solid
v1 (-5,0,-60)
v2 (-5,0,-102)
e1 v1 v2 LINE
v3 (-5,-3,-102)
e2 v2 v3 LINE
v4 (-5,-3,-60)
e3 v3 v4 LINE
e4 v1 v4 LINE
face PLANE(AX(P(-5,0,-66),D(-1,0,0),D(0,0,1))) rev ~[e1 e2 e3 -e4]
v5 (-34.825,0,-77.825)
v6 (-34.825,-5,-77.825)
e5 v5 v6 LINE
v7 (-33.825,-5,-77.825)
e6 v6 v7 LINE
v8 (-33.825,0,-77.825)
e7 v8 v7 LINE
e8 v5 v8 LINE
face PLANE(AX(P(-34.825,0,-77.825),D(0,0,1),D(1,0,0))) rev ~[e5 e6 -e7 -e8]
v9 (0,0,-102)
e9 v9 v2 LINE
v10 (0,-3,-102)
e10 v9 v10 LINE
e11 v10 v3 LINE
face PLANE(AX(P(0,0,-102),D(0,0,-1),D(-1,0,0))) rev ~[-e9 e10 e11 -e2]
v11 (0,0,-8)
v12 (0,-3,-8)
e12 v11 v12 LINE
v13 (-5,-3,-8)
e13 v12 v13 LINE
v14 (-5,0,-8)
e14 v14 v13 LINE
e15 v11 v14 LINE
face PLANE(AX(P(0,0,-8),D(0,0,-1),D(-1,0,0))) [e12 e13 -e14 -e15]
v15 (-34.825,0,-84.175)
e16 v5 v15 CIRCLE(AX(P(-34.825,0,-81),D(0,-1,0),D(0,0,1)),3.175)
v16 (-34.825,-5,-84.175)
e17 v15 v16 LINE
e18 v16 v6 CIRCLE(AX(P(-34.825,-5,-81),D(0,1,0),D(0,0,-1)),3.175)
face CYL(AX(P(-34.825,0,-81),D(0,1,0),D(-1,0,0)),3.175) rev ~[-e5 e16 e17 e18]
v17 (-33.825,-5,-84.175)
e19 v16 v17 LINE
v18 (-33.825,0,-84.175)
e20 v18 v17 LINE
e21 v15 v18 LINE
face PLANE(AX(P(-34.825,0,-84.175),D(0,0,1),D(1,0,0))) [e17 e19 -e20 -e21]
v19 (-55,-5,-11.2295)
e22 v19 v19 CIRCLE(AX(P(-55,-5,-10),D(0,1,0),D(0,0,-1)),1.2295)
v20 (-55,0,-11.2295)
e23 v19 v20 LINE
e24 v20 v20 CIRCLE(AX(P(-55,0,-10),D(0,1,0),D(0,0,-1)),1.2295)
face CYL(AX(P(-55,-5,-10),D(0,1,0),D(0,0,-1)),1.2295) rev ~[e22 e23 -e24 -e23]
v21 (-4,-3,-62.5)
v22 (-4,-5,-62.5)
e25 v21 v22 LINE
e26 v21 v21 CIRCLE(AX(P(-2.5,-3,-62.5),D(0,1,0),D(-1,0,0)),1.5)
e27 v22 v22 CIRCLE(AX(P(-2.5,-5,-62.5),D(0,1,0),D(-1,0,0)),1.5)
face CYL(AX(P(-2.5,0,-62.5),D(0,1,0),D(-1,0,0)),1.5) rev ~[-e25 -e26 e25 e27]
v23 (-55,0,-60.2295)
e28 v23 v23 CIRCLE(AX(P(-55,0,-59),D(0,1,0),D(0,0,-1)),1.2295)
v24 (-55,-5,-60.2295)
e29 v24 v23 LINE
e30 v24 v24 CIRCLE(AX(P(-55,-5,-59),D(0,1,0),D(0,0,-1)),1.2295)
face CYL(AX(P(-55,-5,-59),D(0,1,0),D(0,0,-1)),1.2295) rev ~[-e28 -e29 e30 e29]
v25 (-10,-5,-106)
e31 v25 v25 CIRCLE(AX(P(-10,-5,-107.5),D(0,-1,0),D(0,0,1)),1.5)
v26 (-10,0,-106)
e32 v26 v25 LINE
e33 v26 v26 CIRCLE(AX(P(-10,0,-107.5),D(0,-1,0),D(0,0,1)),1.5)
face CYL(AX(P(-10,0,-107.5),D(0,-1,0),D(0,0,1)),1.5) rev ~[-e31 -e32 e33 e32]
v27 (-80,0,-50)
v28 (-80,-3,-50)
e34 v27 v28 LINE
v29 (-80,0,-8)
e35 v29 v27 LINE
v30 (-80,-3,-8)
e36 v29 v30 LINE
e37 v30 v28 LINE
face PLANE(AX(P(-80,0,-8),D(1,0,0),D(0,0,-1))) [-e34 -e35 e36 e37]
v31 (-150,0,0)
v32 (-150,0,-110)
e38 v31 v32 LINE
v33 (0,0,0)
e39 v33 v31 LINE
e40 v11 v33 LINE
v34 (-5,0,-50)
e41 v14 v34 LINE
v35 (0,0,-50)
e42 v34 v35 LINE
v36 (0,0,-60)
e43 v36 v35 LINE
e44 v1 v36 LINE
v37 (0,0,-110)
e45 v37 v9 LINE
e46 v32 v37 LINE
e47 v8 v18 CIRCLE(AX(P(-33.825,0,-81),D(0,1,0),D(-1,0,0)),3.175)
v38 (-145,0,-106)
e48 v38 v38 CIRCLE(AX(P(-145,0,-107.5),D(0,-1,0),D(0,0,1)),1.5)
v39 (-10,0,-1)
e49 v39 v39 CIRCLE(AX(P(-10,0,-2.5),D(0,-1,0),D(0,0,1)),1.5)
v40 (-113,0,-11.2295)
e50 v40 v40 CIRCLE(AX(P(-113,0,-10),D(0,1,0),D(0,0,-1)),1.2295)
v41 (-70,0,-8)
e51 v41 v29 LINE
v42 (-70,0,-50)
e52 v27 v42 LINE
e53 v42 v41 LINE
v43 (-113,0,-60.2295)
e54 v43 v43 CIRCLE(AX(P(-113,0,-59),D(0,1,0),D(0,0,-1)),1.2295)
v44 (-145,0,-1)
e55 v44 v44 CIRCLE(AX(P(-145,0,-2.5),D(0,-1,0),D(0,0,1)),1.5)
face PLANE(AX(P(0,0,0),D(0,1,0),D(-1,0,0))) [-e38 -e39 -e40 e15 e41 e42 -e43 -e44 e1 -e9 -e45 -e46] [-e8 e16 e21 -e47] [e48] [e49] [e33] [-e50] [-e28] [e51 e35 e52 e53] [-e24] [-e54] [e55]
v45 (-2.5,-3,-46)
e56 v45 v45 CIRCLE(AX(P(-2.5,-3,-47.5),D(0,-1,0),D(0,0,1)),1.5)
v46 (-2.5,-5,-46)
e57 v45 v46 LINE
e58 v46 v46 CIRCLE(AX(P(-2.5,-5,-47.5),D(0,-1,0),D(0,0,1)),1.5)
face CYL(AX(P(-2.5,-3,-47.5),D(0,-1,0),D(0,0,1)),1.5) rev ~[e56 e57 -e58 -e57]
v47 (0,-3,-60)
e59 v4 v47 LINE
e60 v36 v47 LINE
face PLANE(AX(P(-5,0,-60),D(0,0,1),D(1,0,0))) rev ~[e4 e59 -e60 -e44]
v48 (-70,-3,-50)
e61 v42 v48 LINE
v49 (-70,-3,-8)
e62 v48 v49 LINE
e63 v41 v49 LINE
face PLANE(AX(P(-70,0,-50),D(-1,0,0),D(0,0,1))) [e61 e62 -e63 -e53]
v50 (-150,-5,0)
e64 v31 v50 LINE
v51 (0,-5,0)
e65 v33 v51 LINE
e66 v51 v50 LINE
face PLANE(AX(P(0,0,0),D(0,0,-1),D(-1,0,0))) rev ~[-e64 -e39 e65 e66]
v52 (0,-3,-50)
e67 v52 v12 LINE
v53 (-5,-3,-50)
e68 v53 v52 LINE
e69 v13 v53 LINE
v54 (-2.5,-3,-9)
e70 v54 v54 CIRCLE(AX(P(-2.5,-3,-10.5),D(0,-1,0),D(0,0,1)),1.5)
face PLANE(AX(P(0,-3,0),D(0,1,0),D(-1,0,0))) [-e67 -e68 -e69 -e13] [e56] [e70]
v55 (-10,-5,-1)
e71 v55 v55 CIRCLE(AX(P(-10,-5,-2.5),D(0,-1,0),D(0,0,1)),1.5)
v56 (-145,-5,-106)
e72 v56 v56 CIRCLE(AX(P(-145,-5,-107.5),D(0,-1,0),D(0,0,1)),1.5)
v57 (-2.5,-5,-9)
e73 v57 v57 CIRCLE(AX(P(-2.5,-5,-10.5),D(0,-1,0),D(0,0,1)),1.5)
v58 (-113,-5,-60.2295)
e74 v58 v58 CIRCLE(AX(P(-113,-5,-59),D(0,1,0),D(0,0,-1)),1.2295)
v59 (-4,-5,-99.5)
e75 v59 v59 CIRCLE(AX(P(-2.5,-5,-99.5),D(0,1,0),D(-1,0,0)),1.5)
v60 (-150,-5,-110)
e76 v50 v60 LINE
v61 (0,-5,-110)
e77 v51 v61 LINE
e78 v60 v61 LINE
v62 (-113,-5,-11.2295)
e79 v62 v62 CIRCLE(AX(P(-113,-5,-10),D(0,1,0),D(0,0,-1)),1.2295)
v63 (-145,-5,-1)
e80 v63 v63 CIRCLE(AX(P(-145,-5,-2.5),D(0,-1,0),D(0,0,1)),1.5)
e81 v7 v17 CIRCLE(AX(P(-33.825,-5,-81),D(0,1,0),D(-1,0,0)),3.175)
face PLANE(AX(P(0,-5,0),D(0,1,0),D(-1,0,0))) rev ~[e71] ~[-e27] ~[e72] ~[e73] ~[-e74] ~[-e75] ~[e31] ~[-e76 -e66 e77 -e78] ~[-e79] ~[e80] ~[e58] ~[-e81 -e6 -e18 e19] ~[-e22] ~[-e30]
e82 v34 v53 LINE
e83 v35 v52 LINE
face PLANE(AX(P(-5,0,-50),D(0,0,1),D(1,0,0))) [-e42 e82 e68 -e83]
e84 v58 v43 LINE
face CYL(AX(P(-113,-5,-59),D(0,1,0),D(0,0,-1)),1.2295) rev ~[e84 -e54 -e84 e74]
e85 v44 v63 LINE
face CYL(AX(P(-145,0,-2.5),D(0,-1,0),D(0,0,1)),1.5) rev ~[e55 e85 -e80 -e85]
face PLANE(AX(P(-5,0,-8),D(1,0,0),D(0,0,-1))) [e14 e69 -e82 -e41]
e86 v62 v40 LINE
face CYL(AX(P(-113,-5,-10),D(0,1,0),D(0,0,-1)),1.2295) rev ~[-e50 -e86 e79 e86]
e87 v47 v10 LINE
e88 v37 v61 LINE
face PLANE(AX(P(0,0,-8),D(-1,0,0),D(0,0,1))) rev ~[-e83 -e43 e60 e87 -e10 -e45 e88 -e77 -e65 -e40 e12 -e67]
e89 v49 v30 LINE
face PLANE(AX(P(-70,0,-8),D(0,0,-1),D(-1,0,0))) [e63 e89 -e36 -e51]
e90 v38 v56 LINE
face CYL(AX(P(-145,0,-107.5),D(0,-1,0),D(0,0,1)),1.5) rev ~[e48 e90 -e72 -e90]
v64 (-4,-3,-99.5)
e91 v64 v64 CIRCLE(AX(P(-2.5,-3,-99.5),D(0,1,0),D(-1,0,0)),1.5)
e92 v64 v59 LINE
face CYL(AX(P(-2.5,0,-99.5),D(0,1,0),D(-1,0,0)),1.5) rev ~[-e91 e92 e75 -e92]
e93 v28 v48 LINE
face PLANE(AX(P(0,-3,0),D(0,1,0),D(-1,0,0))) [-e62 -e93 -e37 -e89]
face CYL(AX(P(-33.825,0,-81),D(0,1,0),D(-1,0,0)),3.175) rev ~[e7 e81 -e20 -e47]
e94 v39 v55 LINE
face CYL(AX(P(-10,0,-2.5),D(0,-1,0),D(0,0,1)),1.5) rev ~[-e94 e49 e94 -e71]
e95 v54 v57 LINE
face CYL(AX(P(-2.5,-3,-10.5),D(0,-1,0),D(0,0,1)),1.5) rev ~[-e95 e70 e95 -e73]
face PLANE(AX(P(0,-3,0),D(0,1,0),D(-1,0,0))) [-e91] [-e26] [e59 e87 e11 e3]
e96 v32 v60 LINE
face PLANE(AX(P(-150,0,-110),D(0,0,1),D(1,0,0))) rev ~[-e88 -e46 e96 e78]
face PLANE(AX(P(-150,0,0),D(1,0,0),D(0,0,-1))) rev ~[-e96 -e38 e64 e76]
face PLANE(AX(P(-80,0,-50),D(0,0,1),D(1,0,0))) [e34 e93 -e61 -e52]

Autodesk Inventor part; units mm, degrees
ref_plane "YZ Plane" through (0, 0, 0) normal (1, 0, 0) x (0, 1, 0)
ref_plane "XZ Plane" through (0, 0, 0) normal (0, 1, 0) x (-1, 0, 0)
ref_plane "XY Plane" through (0, 0, 0) normal (0, 0, 1) x (1, 0, 0)
sketch "Sketch1" plane through (0, 0, 0) normal (0, 1, 0) x (-1, 0, 0)
  line L0 (0, 0) -> (150, 0)
  line L1 (150, 0) -> (150, -110)
  line L2 (150, -110) -> (0, -110)
  line L3 (0, -110) -> (0, 0)
  line L4 (40, -60) -> (0, -60)
  line L5 (0, -60) -> (0, -102)
  line L6 (0, -102) -> (40, -102)
  line L7 (40, -102) -> (40, -60)
  circle A0 centre (2.5, -62.5) radius 1.5
  circle A1 centre (2.5, -99.5) radius 1.5
  circle A2 centre (34.825, -81) radius 3.175
  circle A3 centre (33.825, -81) radius 3.175
  line L8 (34.825, -77.825) -> (33.825, -77.825)
  line L9 (34.825, -84.175) -> (33.825, -84.175)
  line L10 (37, -77.825) -> (37, -84.175) construction
  line L11 (25, -96) -> (0, -96)
  line L12 (0, -96) -> (0, -66)
  line L13 (0, -66) -> (25, -66)
  line L14 (25, -66) -> (25, -96)
  line L15 (5, -102) -> (5, -96)
  line L16 (5, -66) -> (5, -60)
  line L17 (5, -50) -> (0, -50)
  line L18 (0, -50) -> (0, -8)
  line L19 (0, -8) -> (5, -8)
  line L20 (5, -8) -> (5, -50)
  line L21 (5, -96) -> (5, -66)
  line L22 (80, -50) -> (70, -50)
  line L23 (70, -50) -> (70, -8)
  line L24 (70, -8) -> (80, -8)
  line L25 (80, -8) -> (80, -50)
  point P0 (0, -81)
  point P1 (40, -81)
  point P2 (0, -60)
  point P3 (25, -81)
  point P4 (5, -99)
  point P5 (0, -66)
  point P6 (0, -96)
  point P7 (0, -50)
  point P8 (70, -29)
  point P9 (5, -29)
  dimension "d0" = 110
  dimension "d3" = 42
  dimension "d6" = 40
  dimension "d13" = 3
  dimension "d14" = 3
  dimension "d18" = 2.5
  dimension "d19" = 2.5
  dimension "d20" = 2.5
  dimension "d21" = 2.5
  dimension "d22" = 6.35
  dimension "d23" = 1
  dimension "d26" = 37
  dimension "d29" = 25
  dimension "d30" = 30
  dimension "d31" = 5
  dimension "d32" = 150
  dimension "d33" = 8
  dimension "d34" = 42
  dimension "d35" = 5
  dimension "d36" = 8
  dimension "d73" = 10
  dimension "d74" = 42
  dimension "d75" = 70
extrude "Extrusion1" add sketch "Sketch1" against normal blind 5 contours L0 L1 L2 L3 L6 L7 L4 L17 L20 L19 | L19 L20 L17 L3 | L4 L16 L13 L3 | L3 L11 L15 L6 | L13 L21 L11 L3 | L4 L7 L6 L15 L11 L14 L13 L16 | L13 L14 L11 L21 | A0 | A1 | A2 A3 | A2 A3 L8 | L9 A3 A2 | A3 A2 | A2 A3 | L22 L23 L24 L25
extrude "Extrusion2" cut sketch "Sketch1" against normal blind 5 contours A0 | A1 | A2 A3 | A2 A3 L8 | L9 A3 A2 | A3 A2 | A2 A3
extrude "Extrusion3" cut sketch "Sketch1" against normal blind 3 contours L19 L20 L17 L3 | L4 L16 L13 L3 | L3 L11 L15 L6 | L13 L21 L11 L3 | L22 L23 L24 L25
sketch "Sketch2" plane through (0, -3, 0) normal (0, 1, 0) x (1, 0, 0)
  line L0 (-5, 50) -> (0, 50) projected
  line L1 (0, 50) -> (0, 8) projected
  line L2 (0, 8) -> (-5, 8) projected
  point P0 (0, 0)
  point P1 (-2.5, 47.5)
  point P2 (-2.5, 10.5)
  dimension "d44" = 2.5
  dimension "d45" = 2.5
  dimension "d46" = 2.5
  dimension "d47" = 2.5
hole "Hole1" at (-2.5, -3, -47.5) at (-2.5, -3, -10.5) direction (0, -1, 0) diameter 3 end through all
sketch "Sketch3" plane through (0, 0, 0) normal (0, 1, 0) x (1, 0, 0)
  line L0 (0, 0) -> (0, 8) projected
  line L1 (-150, 0) -> (0, 0) projected
  line L2 (0, 110) -> (-150, 110) projected
  line L3 (0, 102) -> (0, 110) projected
  point P0 (-10, 2.5)
  point P1 (-10, 107.5)
  dimension "d55" = 10
  dimension "d56" = 2.5
  dimension "d57" = 2.5
  dimension "d58" = 10
hole "Hole2" at (-10, 0, -2.5) at (-10, 0, -107.5) direction (0, -1, 0) diameter 3 depth 6 tip angle 118
pattern_linear "Rectangular Pattern1" count 2 spacing 135 along (-1, 0, 0) of "Hole2"
sketch "Sketch4" plane through (0, -5, 0) normal (0, -1, 0) x (1, 0, 0)
  line L0 (-113, -10) -> (-55, -10) construction
  line L1 (-55, -10) -> (-55, -59) construction
  line L2 (-55, -59) -> (-113, -59) construction
  line L3 (-113, -59) -> (-113, -10) construction
  line L4 (0, 0) -> (-150, 0) construction
  line L5 (0, -110) -> (0, 0) construction
  dimension "d69" = 58
  dimension "d70" = 49
  dimension "d71" = 10
  dimension "d72" = 55
hole "Hole3" at (-113, -5, -10) at (-55, -5, -10) at (-55, -5, -59) at (-113, -5, -59) direction (0, 1, 0) diameter 2.459 end through all thread size "M3x0.5" class "6H" standard "ISO Metric profile"
properties part number "Camera plate" material "Aluminum 6061"
